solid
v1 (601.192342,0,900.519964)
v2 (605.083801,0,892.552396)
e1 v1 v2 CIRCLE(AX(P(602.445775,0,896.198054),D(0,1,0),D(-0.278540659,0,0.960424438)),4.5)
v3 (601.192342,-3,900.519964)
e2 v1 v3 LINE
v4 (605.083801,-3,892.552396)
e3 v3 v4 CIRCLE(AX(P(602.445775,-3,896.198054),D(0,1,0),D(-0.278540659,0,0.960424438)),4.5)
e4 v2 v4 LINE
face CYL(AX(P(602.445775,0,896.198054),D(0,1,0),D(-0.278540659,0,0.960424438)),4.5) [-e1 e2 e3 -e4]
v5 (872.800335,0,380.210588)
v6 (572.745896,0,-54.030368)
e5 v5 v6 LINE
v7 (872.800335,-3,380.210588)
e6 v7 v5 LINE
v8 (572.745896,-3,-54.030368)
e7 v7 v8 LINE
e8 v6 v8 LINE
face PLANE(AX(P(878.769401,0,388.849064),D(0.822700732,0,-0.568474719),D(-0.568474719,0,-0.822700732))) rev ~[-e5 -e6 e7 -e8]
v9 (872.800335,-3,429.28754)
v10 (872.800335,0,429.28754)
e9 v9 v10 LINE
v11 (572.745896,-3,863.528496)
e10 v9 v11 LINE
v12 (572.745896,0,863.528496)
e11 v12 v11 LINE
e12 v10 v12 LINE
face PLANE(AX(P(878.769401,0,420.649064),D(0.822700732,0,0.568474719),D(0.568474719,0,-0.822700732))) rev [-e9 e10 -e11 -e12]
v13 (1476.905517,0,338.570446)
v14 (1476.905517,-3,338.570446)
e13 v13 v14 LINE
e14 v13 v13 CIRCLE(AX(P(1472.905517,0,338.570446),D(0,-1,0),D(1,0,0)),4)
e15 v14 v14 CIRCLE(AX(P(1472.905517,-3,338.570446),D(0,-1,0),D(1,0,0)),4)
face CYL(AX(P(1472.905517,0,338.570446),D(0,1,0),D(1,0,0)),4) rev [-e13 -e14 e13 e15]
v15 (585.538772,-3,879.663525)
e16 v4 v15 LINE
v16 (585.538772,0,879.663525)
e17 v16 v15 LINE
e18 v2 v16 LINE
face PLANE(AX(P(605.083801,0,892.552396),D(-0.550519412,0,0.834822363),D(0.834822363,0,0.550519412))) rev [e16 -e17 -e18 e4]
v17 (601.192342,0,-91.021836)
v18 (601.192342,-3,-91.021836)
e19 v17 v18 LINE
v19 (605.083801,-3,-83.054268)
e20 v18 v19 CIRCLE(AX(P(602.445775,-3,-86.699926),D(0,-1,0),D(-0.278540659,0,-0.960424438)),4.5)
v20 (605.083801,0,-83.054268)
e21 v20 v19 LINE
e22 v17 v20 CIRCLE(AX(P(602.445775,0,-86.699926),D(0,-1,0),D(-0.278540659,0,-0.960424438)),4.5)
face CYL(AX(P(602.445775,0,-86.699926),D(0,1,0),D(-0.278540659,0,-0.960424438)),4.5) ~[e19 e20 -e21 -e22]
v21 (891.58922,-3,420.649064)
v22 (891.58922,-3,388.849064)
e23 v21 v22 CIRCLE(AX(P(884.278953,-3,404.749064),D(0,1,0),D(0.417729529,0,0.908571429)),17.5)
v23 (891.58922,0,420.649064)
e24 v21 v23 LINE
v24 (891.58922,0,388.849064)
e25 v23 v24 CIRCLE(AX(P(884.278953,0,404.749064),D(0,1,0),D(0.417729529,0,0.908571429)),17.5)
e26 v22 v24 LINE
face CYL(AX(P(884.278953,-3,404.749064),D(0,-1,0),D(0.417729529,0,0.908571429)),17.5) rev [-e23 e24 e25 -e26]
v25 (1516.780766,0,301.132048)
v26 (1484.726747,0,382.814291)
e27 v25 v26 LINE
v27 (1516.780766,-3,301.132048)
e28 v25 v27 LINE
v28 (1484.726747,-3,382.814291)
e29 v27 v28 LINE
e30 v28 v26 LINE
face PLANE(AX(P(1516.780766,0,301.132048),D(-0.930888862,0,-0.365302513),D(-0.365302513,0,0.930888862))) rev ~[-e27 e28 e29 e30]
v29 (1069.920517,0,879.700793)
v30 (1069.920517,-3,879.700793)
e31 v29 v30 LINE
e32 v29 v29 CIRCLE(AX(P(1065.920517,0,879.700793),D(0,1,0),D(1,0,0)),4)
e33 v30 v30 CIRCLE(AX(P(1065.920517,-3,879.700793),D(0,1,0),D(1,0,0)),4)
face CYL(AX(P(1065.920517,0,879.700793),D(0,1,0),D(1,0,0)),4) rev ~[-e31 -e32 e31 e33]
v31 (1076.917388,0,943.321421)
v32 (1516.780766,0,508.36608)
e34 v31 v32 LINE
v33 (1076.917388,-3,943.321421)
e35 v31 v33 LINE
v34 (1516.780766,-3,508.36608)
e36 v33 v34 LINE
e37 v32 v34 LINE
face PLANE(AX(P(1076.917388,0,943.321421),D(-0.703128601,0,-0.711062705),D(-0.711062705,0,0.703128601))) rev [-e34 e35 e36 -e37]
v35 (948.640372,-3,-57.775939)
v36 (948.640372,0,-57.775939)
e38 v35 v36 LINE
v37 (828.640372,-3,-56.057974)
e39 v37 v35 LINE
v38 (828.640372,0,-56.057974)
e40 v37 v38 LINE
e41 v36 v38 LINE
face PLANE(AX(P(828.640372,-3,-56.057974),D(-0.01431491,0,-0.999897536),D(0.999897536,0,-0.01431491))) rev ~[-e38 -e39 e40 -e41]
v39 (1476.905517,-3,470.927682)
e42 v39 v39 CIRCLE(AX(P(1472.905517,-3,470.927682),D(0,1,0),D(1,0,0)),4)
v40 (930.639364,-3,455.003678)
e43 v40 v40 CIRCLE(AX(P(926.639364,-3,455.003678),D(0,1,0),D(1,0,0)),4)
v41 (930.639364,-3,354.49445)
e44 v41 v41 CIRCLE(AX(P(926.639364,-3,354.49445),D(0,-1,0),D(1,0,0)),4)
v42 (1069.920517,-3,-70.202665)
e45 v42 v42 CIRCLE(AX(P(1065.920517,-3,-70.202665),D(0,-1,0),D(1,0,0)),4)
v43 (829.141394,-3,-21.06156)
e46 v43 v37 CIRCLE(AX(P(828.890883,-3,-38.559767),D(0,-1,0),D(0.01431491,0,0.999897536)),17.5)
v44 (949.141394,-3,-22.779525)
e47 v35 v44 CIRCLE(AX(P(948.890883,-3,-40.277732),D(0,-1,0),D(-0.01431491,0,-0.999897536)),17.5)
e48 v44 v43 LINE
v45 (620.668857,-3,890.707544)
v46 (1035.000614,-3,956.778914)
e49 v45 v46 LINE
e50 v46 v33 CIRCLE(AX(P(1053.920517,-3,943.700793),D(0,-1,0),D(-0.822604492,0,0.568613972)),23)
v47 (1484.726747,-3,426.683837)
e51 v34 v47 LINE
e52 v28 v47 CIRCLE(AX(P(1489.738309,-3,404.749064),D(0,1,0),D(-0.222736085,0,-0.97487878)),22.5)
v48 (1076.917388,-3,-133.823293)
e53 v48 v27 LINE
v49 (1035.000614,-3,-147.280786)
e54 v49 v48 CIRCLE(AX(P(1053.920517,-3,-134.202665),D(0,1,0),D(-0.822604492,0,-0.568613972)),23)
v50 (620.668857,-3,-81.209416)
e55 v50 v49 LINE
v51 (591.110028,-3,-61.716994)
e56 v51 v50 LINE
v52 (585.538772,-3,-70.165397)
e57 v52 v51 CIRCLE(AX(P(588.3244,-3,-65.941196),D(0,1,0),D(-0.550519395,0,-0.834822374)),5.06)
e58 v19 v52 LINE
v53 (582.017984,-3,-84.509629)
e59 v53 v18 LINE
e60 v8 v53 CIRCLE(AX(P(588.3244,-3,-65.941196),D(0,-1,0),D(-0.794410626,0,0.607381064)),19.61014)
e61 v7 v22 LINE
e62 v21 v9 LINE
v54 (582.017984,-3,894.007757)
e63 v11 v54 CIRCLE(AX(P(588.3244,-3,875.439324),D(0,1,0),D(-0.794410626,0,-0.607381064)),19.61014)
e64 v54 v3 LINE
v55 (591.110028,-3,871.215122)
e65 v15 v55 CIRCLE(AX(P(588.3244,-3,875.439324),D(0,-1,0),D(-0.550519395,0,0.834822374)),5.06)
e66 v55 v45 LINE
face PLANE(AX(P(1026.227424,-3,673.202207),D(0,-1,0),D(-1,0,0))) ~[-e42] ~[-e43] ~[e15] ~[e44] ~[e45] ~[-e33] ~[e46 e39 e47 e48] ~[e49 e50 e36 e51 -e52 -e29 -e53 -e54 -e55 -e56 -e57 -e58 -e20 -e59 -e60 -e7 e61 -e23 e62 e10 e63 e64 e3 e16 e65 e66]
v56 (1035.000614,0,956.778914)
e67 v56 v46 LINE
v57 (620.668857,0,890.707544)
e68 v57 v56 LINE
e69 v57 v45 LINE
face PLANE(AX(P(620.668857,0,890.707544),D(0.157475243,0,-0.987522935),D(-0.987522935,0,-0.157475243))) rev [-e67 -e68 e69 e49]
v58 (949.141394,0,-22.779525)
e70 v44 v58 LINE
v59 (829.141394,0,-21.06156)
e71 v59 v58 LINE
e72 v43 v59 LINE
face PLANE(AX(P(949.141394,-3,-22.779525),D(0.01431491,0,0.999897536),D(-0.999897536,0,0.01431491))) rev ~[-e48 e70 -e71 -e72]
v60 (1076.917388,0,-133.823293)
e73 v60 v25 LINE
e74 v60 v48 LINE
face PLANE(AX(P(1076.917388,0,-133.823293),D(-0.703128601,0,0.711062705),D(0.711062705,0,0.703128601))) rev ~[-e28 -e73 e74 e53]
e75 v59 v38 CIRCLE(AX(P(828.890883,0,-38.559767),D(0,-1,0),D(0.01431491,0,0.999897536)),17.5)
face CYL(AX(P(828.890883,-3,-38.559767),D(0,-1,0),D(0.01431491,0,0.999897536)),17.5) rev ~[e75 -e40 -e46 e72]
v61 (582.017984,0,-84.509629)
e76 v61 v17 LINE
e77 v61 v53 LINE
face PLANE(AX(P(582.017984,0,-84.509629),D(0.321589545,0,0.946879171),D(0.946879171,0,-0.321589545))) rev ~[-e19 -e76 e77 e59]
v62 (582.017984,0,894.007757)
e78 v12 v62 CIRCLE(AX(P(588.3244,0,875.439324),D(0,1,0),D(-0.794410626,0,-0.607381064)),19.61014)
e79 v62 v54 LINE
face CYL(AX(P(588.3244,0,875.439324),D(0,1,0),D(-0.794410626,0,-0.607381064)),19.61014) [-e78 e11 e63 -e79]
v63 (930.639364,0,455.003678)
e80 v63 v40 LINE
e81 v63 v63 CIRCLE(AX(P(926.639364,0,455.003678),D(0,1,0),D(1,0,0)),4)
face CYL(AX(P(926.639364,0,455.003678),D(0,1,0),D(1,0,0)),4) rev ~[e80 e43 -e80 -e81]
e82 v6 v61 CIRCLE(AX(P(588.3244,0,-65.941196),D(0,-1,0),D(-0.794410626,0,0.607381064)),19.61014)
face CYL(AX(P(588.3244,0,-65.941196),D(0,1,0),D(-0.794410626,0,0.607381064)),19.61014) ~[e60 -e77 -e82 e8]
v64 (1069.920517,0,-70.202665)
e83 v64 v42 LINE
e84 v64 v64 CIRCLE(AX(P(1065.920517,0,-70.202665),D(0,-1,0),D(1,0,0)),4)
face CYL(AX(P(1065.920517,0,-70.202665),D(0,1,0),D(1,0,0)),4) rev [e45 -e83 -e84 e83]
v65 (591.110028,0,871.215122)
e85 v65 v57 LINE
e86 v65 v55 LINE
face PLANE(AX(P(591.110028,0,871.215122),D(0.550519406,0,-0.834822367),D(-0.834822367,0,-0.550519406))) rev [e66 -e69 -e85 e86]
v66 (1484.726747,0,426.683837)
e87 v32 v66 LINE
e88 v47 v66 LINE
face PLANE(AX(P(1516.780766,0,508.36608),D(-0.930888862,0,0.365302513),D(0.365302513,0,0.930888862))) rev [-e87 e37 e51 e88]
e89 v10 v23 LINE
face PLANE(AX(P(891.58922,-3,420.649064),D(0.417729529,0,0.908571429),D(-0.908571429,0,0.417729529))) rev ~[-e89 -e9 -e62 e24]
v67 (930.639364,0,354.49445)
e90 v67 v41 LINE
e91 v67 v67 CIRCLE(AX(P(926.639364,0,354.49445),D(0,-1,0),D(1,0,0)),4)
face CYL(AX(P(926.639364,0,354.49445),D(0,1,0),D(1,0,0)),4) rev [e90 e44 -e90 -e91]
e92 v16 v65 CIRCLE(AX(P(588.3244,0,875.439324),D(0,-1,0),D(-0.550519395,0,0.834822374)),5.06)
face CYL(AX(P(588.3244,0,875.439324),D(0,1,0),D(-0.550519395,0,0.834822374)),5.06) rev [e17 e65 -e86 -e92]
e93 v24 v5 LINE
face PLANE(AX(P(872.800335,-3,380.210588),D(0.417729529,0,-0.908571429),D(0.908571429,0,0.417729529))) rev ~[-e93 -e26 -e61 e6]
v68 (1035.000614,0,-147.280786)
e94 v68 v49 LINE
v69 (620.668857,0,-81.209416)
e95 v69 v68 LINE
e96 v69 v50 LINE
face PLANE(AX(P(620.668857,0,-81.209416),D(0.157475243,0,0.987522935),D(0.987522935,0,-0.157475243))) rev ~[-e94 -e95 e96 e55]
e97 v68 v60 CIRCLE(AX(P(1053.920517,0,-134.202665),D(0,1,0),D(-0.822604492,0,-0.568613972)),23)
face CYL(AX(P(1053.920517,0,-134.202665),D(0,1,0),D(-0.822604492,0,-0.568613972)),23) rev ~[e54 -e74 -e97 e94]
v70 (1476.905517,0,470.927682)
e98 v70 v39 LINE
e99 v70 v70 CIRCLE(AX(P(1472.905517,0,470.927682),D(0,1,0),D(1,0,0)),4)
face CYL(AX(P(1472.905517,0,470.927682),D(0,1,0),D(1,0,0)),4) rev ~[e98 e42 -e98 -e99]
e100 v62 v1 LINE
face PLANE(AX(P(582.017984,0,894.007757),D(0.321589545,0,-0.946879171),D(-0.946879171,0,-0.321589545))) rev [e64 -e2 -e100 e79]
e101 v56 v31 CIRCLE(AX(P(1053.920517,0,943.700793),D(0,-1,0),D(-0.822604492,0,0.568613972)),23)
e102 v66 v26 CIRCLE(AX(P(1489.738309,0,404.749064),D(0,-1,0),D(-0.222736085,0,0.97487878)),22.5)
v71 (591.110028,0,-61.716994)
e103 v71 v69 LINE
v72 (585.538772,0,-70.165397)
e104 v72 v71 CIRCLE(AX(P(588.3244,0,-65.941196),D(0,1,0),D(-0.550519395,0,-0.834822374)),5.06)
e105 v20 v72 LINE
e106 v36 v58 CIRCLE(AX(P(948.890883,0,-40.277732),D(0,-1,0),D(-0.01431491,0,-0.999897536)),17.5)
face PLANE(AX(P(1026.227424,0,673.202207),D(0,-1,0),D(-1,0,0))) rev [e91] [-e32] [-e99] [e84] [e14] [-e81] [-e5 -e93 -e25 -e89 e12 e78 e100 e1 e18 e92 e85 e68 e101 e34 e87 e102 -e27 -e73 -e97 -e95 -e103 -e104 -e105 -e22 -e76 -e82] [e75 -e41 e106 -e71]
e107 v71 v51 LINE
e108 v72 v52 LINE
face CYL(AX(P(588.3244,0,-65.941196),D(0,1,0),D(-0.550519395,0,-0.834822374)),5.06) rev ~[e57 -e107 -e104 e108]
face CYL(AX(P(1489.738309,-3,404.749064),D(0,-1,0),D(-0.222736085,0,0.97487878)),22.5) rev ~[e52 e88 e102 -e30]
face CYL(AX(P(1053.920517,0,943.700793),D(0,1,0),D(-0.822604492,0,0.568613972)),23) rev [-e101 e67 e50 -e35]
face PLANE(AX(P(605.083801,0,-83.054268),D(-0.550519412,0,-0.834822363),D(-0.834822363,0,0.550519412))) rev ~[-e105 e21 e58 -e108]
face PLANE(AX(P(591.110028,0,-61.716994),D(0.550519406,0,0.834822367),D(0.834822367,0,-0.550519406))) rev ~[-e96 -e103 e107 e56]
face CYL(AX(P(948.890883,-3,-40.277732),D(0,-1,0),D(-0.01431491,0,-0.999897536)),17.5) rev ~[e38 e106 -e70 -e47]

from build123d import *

# Parameters (mm, degrees)
F0_R     = 4
F1_DEPTH = 3
F5_DEPTH = 3
F8_DEPTH = 25
F9_DEPTH = 25


# Not quite as in the source:
# - ends of sketch curves that miss each other by under 0.0002 mm in the source are joined


with BuildPart() as f1:
    # F0 (on Front) → F1 (new body)
    with BuildSketch(Plane.XZ):
        with BuildLine():
            ThreePointArc((585.5387718609, -70.1653972109), (584.1001986375, -63.1555680907), (591.1100276795, -61.716994486))
            Line((591.1100276795, -61.716994486), (620.6688569888, -81.2094156242))
            Line((620.6688569888, -81.2094156242), (1035.0006136748, -147.2807863546))
            ThreePointArc((1035.0006136748, -147.2807863546), (1046.8897667562, -112.3036113444), (1076.917388022, -133.8232928895))
            Line((1076.917388022, -133.8232928895), (1516.7807656982, 301.1320483365))
            Line((1516.7807656982, 301.1320483365), (1482.3585617346, 388.849064))
            Line((1482.3585617346, 388.849064), (878.7694007197, 388.849064))
            Line((878.7694007197, 388.849064), (572.7458963991, -54.0303683051))
            ThreePointArc((572.7458963991, -54.0303683051), (569.563169725, -71.6485447179), (582.0179839674, -84.5096290961))
            Line((582.0179839674, -84.5096290961), (601.192342, -91.021836))
            ThreePointArc((601.192342, -91.021836), (606.4892645676, -88.6748164062), (605.0838007766, -83.0542683087))
            Line((605.0838007766, -83.0542683087), (585.5387718609, -70.1653972109))
        make_face()
        with Locations((1065.920517, -70.202665)):
            Circle(F0_R, mode=Mode.SUBTRACT)
        with Locations((926.6393642448, 354.4944504476)):
            Circle(F0_R, mode=Mode.SUBTRACT)
        with Locations((1472.9055166245, 338.570445776)):
            Circle(F0_R, mode=Mode.SUBTRACT)
    extrude(amount=F1_DEPTH)


with BuildPart() as f3_1:
    # F3: instance of F1
    add(f1.part.mirror(Plane(origin=(1180.5639812271, -1.5, 404.749064), x_dir=(1, 0, 0), z_dir=(0, 0, 1))))


with BuildPart() as f1_1:
    add(f1.part)

    add(f3_1.part)  # F5 merges F3_1
    # F4 (on face) → F5 (join, through all)
    with BuildSketch(Plane.XZ.offset(3)):
        with BuildLine():
            ThreePointArc((1473.8185102428, 388.849064), (1467.2383092365, 404.749064), (1473.8185102428, 420.649064))
            Line((1473.8185102428, 420.649064), (891.5892198284, 420.649064))
            ThreePointArc((891.5892198284, 420.649064), (901.7789530754, 404.749064), (891.5892198284, 388.849064))
            Line((891.5892198284, 388.849064), (1473.8185102428, 388.849064))
        make_face()
    extrude(amount=-F5_DEPTH)

    # F7 (on face) → F8 (cut)
    with BuildSketch(Plane.XZ.offset(3)):
        with BuildLine():
            Line((949.1413939246, -22.7795250632), (829.1413939246, -21.0615598373))
            ThreePointArc((829.1413939246, -21.0615598373), (811.3926761125, -38.3092558002), (828.6403720754, -56.0579736122))
            Line((828.6403720754, -56.0579736122), (948.6403720754, -57.7759388381))
            ThreePointArc((948.6403720754, -57.7759388381), (966.3890898875, -40.5282428752), (949.1413939246, -22.7795250632))
        make_face()
    extrude(amount=-F8_DEPTH, mode=Mode.SUBTRACT)

    # F6 (on face) → F9 (cut)
    with BuildSketch(Plane.XZ.offset(3)):
        with BuildLine():
            ThreePointArc((891.5892198284, 388.849064), (901.7789530754, 404.749064), (891.5892198284, 420.649064))
            Line((891.5892198284, 420.649064), (872.8003346685, 429.2875396296))
            Line((872.8003346685, 429.2875396296), (872.8003346685, 380.2105883704))
            Line((872.8003346685, 380.2105883704), (891.5892198284, 388.849064))
        make_face()
        with BuildLine():
            Line((1484.726747317, 382.814291443), (1484.726747317, 426.683836557))
            ThreePointArc((1484.726747317, 426.683836557), (1467.2383092365, 404.749064), (1484.726747317, 382.814291443))
        make_face()
    extrude(amount=-F9_DEPTH, mode=Mode.SUBTRACT)


solid = f1_1.part
